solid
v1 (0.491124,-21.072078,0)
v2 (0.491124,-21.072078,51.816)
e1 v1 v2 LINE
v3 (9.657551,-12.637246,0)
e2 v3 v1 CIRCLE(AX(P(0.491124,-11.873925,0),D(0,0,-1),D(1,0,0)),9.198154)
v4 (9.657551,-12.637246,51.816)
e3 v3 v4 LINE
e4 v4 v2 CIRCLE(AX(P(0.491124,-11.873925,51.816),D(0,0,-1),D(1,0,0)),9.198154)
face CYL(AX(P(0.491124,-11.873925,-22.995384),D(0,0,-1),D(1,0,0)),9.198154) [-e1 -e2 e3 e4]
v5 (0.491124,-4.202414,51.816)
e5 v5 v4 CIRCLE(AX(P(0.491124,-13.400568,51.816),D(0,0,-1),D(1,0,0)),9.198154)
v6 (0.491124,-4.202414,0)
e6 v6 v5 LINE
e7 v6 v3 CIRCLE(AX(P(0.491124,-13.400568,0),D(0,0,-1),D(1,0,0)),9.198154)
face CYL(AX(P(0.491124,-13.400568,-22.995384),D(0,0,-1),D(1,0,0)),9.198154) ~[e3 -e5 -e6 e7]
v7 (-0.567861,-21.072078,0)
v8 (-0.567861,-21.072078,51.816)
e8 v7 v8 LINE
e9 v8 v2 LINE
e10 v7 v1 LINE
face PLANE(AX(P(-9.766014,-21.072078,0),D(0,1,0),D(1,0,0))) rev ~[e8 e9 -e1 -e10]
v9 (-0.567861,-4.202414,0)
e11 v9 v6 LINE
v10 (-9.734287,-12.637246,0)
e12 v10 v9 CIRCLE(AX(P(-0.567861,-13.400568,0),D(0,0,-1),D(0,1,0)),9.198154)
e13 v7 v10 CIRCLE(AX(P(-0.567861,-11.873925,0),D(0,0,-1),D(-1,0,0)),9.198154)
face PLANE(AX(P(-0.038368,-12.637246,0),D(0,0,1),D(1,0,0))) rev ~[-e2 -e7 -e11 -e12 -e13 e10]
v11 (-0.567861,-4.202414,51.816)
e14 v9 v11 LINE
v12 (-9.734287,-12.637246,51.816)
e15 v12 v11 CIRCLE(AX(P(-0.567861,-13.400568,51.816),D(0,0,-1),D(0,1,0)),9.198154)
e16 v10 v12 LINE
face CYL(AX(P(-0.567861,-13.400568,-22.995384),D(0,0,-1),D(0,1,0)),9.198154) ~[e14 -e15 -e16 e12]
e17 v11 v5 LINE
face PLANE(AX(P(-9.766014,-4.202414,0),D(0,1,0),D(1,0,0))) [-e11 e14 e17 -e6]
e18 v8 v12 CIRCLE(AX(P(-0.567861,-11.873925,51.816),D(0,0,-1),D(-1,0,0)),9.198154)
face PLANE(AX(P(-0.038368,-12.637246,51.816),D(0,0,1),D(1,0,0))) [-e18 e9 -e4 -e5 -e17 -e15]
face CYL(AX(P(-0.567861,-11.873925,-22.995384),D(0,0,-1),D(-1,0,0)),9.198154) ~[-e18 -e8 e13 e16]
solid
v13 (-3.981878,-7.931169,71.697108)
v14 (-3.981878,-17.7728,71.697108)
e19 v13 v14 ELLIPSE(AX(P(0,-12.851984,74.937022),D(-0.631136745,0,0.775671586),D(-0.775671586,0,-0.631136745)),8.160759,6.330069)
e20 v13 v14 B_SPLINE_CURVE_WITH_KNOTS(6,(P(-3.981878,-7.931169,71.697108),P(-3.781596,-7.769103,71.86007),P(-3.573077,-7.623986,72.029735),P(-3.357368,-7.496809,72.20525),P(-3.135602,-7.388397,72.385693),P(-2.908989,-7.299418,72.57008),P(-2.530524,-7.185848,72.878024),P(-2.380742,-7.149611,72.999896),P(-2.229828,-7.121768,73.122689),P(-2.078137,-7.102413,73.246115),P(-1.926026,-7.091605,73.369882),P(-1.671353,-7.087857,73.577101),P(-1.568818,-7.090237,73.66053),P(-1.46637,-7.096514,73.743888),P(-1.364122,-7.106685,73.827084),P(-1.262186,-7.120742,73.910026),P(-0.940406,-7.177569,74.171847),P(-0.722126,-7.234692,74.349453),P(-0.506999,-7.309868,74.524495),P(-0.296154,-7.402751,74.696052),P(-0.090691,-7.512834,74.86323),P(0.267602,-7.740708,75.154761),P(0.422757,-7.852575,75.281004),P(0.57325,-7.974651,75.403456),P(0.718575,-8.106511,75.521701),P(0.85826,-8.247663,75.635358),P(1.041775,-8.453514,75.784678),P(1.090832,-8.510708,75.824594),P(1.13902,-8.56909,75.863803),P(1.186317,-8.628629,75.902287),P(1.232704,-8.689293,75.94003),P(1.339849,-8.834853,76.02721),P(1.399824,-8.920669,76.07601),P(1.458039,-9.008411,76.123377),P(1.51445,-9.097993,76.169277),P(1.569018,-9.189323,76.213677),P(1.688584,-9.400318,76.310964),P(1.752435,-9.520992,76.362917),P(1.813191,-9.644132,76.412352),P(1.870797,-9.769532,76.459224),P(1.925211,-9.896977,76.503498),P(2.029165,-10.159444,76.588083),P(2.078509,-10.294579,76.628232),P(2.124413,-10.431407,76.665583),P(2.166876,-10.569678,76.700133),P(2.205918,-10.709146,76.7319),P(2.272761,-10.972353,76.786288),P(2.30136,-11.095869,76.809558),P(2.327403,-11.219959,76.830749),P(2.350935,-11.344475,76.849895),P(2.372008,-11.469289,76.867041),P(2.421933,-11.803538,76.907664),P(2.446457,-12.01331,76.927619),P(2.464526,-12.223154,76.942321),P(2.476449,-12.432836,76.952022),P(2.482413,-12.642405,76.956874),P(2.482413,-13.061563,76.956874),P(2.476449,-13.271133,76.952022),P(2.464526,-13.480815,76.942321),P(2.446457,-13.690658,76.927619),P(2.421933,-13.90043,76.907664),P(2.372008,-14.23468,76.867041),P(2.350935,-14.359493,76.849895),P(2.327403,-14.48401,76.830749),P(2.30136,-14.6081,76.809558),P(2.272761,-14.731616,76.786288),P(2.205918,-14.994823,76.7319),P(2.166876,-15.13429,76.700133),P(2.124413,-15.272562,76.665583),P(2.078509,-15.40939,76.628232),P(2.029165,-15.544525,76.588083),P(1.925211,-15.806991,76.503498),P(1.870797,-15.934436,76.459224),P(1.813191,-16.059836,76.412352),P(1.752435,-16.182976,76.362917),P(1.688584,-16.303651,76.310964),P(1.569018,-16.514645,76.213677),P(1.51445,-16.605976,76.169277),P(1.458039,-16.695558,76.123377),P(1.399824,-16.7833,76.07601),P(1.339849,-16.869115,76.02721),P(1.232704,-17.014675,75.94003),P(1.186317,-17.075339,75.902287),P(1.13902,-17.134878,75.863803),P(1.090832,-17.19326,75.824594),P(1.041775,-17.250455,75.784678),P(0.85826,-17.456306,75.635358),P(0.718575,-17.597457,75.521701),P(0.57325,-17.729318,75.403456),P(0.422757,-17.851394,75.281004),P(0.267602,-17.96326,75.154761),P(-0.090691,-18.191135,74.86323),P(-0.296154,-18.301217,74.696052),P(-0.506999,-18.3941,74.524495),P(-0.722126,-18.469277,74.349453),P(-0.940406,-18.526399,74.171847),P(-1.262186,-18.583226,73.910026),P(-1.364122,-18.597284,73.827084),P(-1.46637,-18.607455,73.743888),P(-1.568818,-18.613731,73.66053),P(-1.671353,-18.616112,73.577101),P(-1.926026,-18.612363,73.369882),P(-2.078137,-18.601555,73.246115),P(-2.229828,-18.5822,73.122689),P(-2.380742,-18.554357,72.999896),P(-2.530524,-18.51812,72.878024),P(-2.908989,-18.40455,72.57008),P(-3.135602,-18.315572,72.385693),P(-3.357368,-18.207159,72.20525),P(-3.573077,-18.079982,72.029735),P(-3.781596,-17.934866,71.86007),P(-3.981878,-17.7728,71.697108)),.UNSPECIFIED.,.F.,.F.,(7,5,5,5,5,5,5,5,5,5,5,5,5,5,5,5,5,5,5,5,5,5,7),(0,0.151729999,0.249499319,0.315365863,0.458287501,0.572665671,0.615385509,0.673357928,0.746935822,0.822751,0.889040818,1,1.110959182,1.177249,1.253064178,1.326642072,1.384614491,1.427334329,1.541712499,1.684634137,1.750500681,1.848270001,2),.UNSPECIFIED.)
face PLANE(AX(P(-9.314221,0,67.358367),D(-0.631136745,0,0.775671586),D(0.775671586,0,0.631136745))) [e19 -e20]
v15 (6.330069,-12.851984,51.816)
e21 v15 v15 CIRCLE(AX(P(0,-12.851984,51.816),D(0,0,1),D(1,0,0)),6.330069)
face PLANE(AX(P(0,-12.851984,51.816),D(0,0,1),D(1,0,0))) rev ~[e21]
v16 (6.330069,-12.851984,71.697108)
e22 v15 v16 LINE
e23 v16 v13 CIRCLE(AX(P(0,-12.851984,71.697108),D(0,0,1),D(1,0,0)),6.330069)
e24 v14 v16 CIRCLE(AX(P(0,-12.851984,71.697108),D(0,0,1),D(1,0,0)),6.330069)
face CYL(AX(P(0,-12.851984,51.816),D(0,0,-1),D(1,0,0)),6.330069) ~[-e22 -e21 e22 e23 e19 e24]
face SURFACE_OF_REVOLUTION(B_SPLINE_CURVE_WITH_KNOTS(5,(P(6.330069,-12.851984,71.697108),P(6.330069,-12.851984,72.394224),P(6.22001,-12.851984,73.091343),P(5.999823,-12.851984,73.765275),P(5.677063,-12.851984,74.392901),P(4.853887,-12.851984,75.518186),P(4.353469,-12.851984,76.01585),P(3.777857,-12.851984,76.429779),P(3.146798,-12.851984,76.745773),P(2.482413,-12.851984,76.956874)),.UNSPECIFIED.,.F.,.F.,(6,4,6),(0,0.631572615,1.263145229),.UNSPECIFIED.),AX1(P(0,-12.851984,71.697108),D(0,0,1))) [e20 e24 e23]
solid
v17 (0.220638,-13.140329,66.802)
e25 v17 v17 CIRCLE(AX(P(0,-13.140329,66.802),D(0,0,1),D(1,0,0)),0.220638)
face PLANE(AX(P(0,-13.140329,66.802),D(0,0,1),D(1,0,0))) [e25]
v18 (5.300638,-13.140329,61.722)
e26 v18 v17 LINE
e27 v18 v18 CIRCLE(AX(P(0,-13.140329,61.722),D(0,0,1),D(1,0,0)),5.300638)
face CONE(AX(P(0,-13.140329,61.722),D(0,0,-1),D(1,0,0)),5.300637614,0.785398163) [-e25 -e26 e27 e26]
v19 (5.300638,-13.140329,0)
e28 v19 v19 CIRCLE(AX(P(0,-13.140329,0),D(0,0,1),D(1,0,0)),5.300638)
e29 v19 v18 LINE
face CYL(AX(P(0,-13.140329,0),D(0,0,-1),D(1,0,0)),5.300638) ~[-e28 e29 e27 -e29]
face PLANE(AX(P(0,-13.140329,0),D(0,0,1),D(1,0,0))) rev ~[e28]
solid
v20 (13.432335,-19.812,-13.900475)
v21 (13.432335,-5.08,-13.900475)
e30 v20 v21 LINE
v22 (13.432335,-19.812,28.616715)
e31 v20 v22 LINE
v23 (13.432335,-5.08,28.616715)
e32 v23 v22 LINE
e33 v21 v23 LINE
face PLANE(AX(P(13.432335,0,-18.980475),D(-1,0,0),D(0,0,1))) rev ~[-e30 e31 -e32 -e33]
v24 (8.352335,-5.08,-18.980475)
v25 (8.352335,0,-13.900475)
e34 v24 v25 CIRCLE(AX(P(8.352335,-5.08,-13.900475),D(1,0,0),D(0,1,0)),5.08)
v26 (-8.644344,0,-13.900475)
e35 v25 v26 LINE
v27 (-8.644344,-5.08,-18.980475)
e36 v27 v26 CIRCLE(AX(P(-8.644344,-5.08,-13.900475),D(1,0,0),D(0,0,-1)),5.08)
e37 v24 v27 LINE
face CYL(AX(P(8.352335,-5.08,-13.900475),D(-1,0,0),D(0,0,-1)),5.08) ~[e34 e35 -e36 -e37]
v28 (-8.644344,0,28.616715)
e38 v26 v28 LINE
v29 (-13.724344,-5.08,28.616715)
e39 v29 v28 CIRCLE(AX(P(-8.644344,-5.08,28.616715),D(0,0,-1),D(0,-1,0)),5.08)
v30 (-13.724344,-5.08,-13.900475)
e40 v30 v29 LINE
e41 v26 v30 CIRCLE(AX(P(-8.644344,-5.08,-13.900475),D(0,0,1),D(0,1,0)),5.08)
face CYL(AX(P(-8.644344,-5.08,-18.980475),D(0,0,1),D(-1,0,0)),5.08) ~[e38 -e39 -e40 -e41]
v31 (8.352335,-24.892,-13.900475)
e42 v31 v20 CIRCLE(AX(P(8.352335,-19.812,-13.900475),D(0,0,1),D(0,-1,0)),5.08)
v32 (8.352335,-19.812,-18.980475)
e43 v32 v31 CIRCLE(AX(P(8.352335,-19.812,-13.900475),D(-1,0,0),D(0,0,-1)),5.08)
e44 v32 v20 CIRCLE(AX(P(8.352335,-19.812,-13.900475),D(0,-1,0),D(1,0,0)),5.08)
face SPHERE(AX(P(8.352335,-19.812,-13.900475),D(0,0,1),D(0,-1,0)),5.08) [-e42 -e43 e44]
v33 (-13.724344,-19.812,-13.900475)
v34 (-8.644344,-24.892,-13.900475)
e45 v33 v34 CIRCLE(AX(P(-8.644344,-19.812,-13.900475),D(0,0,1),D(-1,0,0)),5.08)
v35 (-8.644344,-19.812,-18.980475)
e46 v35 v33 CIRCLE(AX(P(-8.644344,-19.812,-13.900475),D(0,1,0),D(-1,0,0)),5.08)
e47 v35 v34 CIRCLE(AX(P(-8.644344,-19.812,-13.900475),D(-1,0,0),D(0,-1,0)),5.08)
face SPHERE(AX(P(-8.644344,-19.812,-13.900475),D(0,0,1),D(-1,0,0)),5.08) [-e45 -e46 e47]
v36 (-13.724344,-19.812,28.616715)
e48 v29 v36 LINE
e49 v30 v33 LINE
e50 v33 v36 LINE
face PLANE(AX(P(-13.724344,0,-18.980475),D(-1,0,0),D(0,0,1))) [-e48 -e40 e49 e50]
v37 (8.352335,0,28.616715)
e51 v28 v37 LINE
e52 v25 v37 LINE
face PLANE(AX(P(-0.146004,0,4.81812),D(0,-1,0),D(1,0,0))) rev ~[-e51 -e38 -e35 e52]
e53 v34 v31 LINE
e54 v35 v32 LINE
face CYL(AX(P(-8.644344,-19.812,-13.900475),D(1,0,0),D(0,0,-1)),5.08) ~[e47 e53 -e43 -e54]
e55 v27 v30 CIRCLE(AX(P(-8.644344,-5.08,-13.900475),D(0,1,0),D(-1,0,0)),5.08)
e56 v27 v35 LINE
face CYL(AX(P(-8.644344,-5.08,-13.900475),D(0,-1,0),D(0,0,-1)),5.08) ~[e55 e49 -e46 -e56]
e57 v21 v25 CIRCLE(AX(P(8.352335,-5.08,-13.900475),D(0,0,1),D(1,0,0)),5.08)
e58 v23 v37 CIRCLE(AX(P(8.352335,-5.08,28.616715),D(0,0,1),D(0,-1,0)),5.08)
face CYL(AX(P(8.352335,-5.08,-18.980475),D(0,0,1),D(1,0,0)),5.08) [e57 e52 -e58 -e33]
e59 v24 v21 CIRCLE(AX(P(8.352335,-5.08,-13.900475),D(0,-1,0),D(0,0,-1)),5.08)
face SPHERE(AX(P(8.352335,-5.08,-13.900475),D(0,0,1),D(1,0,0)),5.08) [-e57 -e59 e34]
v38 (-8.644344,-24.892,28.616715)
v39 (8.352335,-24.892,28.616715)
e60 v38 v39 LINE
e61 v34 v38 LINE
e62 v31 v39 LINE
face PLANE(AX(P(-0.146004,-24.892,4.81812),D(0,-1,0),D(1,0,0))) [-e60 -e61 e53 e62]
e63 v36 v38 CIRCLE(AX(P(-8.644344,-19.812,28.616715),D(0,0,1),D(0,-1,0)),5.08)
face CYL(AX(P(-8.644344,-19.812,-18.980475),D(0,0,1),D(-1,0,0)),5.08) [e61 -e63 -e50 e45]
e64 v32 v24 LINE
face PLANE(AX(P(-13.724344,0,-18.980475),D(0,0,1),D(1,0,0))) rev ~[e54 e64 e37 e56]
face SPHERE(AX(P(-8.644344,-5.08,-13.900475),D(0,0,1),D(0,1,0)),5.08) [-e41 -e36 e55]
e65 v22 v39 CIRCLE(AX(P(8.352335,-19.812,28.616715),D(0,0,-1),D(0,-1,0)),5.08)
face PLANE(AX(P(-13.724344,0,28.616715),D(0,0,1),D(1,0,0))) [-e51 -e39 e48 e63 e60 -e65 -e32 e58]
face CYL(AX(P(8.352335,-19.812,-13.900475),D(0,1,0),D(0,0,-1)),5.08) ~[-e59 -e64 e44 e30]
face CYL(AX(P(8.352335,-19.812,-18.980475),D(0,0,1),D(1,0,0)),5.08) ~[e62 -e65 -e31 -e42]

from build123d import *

# Parameters (mm, degrees)
F0_R         = 46.2156340315
F1_DEPTH     = 68.834
F2_R         = 33.7265634664
F4_W         = 27.1566789597
F4_H         = 47.5971903652
F5_DEPTH     = 24.892
F6_R         = 5.08
F7_R         = 5.08
F8_W         = 19.4552922621
F8_H         = 16.8696646579
F9_DEPTH     = 51.816
F10_T1_DEPTH = 97.8067683632
F11_R        = 5.3006376135
F12_DEPTH    = 66.802
F13_SIZE     = 5.08
F14_R        = 6.3300692049
F15_DEPTH    = 25.4
F16_R        = 5.5188922036
F18_DEPTH    = 26.416


# Not quite as in the source:
# - a fillet or chamfer that OpenCascade refuses, or shapes differently, is made with other operations: its cross-section is extruded or revolved along the edge and cut away or added


with BuildPart() as f1:
    # F0 (on Front) → F1 (new body)
    with BuildSketch(Plane.XZ):
        Circle(F0_R)
    extrude(amount=F1_DEPTH)

    # F2
    f2_edges = [f1.edges().sort_by_distance(p)[0] for p in [
        (46.215634, -34.417, 0),
        (-46.215634, 0, 0),
        (-46.215634, -68.834, 0),
    ]]
    fillet(f2_edges, radius=F2_R)


with BuildPart() as f5:
    # F4 (on Front) → F5 (new body)
    with BuildSketch(Plane.XZ):
        with Locations((-0.1460043713, 4.81812004)):
            Rectangle(F4_W, F4_H)
    extrude(amount=F5_DEPTH)

    # F6
    f6_edges = [f5.edges().sort_by_distance(p)[0] for p in [
        (13.432335, -24.892, 4.81812),
        (13.432335, 0, 4.81812),
        (-13.724344, 0, 4.81812),
        (-13.724344, -24.892, 4.81812),
    ]]
    fillet(f6_edges, radius=F6_R)

    # F7
    f7_edges = [f5.edges().sort_by_distance(p)[0] for p in [
        (-12.236446, -23.404102, -18.980475),
    ]]
    fillet(f7_edges, radius=F7_R)


with BuildPart() as f9:
    # F8 (on Top) → F9 (new body)
    with BuildSketch(Plane.XY):
        with Locations((-0.0383681618, -12.6372461673)):
            Rectangle(F8_W, F8_H)
    extrude(amount=F9_DEPTH)

    # F10: fillet of radius 9.1981536726 on 4 edges, made by hand

    # F10_s2 → F10_t1 (cut)
    with BuildSketch(Plane.XY.offset(-22.9953841816)):
        with BuildLine():
            ThreePointArc((9.6892779693, -13.400567511), (6.995201133, -6.8964906747), (0.4911242967, -4.2024138384))
            Line((0.4911242967, -4.2024138384), (9.6892779693, -4.2024138384))
            Line((9.6892779693, -4.2024138384), (9.6892779693, -13.400567511))
        make_face()
        with BuildLine():
            ThreePointArc((9.6892779693, -11.8739248236), (6.995201133, -18.3780016599), (0.4911242967, -21.0720784962))
            Line((0.4911242967, -21.0720784962), (9.6892779693, -21.0720784962))
            Line((9.6892779693, -21.0720784962), (9.6892779693, -11.8739248236))
        make_face()
        with BuildLine():
            ThreePointArc((-0.5678606202, -4.2024138384), (-7.0719374565, -6.8964906747), (-9.7660142928, -13.400567511))
            Line((-9.7660142928, -13.400567511), (-9.7660142928, -4.2024138384))
            Line((-9.7660142928, -4.2024138384), (-0.5678606202, -4.2024138384))
        make_face()
        with BuildLine():
            ThreePointArc((-9.7660142928, -11.8739248236), (-7.0719374565, -18.3780016599), (-0.5678606202, -21.0720784962))
            Line((-0.5678606202, -21.0720784962), (-9.7660142928, -21.0720784962))
            Line((-9.7660142928, -21.0720784962), (-9.7660142928, -11.8739248236))
        make_face()
    extrude(amount=F10_T1_DEPTH, mode=Mode.SUBTRACT)


with BuildPart() as f12:
    # F11 (on Top) → F12 (new body)
    with BuildSketch(Plane.XY):
        with Locations((0, -13.1403291598)):
            Circle(F11_R)
    extrude(amount=F12_DEPTH)

    # F13
    f13_edges = [f12.edges().sort_by_distance(p)[0] for p in [
        (-5.300638, -13.140329, 66.802),
    ]]
    chamfer(f13_edges, length=F13_SIZE)


with BuildPart() as f15:
    # F14 (on face) → F15 (new body)
    with BuildSketch(Plane.XY.offset(51.816)):
        with Locations((0, -12.8519842401)):
            Circle(F14_R)
    extrude(amount=F15_DEPTH)

    # F16
    f16_edges = [f15.edges().sort_by_distance(p)[0] for p in [
        (-6.330069, -12.851984, 77.216),
    ]]
    fillet(f16_edges, radius=F16_R)

    # F17 (on Front) → F18 (cut)
    with BuildSketch(Plane.XZ):
        Polygon((-14.298915863, 84.5396593213), (-9.31422133, 67.3583671451), (7.7610081062, 81.2518820167), align=None)
    extrude(amount=F18_DEPTH, mode=Mode.SUBTRACT)


solid = Compound([f5.part, f9.part, f12.part, f15.part])
